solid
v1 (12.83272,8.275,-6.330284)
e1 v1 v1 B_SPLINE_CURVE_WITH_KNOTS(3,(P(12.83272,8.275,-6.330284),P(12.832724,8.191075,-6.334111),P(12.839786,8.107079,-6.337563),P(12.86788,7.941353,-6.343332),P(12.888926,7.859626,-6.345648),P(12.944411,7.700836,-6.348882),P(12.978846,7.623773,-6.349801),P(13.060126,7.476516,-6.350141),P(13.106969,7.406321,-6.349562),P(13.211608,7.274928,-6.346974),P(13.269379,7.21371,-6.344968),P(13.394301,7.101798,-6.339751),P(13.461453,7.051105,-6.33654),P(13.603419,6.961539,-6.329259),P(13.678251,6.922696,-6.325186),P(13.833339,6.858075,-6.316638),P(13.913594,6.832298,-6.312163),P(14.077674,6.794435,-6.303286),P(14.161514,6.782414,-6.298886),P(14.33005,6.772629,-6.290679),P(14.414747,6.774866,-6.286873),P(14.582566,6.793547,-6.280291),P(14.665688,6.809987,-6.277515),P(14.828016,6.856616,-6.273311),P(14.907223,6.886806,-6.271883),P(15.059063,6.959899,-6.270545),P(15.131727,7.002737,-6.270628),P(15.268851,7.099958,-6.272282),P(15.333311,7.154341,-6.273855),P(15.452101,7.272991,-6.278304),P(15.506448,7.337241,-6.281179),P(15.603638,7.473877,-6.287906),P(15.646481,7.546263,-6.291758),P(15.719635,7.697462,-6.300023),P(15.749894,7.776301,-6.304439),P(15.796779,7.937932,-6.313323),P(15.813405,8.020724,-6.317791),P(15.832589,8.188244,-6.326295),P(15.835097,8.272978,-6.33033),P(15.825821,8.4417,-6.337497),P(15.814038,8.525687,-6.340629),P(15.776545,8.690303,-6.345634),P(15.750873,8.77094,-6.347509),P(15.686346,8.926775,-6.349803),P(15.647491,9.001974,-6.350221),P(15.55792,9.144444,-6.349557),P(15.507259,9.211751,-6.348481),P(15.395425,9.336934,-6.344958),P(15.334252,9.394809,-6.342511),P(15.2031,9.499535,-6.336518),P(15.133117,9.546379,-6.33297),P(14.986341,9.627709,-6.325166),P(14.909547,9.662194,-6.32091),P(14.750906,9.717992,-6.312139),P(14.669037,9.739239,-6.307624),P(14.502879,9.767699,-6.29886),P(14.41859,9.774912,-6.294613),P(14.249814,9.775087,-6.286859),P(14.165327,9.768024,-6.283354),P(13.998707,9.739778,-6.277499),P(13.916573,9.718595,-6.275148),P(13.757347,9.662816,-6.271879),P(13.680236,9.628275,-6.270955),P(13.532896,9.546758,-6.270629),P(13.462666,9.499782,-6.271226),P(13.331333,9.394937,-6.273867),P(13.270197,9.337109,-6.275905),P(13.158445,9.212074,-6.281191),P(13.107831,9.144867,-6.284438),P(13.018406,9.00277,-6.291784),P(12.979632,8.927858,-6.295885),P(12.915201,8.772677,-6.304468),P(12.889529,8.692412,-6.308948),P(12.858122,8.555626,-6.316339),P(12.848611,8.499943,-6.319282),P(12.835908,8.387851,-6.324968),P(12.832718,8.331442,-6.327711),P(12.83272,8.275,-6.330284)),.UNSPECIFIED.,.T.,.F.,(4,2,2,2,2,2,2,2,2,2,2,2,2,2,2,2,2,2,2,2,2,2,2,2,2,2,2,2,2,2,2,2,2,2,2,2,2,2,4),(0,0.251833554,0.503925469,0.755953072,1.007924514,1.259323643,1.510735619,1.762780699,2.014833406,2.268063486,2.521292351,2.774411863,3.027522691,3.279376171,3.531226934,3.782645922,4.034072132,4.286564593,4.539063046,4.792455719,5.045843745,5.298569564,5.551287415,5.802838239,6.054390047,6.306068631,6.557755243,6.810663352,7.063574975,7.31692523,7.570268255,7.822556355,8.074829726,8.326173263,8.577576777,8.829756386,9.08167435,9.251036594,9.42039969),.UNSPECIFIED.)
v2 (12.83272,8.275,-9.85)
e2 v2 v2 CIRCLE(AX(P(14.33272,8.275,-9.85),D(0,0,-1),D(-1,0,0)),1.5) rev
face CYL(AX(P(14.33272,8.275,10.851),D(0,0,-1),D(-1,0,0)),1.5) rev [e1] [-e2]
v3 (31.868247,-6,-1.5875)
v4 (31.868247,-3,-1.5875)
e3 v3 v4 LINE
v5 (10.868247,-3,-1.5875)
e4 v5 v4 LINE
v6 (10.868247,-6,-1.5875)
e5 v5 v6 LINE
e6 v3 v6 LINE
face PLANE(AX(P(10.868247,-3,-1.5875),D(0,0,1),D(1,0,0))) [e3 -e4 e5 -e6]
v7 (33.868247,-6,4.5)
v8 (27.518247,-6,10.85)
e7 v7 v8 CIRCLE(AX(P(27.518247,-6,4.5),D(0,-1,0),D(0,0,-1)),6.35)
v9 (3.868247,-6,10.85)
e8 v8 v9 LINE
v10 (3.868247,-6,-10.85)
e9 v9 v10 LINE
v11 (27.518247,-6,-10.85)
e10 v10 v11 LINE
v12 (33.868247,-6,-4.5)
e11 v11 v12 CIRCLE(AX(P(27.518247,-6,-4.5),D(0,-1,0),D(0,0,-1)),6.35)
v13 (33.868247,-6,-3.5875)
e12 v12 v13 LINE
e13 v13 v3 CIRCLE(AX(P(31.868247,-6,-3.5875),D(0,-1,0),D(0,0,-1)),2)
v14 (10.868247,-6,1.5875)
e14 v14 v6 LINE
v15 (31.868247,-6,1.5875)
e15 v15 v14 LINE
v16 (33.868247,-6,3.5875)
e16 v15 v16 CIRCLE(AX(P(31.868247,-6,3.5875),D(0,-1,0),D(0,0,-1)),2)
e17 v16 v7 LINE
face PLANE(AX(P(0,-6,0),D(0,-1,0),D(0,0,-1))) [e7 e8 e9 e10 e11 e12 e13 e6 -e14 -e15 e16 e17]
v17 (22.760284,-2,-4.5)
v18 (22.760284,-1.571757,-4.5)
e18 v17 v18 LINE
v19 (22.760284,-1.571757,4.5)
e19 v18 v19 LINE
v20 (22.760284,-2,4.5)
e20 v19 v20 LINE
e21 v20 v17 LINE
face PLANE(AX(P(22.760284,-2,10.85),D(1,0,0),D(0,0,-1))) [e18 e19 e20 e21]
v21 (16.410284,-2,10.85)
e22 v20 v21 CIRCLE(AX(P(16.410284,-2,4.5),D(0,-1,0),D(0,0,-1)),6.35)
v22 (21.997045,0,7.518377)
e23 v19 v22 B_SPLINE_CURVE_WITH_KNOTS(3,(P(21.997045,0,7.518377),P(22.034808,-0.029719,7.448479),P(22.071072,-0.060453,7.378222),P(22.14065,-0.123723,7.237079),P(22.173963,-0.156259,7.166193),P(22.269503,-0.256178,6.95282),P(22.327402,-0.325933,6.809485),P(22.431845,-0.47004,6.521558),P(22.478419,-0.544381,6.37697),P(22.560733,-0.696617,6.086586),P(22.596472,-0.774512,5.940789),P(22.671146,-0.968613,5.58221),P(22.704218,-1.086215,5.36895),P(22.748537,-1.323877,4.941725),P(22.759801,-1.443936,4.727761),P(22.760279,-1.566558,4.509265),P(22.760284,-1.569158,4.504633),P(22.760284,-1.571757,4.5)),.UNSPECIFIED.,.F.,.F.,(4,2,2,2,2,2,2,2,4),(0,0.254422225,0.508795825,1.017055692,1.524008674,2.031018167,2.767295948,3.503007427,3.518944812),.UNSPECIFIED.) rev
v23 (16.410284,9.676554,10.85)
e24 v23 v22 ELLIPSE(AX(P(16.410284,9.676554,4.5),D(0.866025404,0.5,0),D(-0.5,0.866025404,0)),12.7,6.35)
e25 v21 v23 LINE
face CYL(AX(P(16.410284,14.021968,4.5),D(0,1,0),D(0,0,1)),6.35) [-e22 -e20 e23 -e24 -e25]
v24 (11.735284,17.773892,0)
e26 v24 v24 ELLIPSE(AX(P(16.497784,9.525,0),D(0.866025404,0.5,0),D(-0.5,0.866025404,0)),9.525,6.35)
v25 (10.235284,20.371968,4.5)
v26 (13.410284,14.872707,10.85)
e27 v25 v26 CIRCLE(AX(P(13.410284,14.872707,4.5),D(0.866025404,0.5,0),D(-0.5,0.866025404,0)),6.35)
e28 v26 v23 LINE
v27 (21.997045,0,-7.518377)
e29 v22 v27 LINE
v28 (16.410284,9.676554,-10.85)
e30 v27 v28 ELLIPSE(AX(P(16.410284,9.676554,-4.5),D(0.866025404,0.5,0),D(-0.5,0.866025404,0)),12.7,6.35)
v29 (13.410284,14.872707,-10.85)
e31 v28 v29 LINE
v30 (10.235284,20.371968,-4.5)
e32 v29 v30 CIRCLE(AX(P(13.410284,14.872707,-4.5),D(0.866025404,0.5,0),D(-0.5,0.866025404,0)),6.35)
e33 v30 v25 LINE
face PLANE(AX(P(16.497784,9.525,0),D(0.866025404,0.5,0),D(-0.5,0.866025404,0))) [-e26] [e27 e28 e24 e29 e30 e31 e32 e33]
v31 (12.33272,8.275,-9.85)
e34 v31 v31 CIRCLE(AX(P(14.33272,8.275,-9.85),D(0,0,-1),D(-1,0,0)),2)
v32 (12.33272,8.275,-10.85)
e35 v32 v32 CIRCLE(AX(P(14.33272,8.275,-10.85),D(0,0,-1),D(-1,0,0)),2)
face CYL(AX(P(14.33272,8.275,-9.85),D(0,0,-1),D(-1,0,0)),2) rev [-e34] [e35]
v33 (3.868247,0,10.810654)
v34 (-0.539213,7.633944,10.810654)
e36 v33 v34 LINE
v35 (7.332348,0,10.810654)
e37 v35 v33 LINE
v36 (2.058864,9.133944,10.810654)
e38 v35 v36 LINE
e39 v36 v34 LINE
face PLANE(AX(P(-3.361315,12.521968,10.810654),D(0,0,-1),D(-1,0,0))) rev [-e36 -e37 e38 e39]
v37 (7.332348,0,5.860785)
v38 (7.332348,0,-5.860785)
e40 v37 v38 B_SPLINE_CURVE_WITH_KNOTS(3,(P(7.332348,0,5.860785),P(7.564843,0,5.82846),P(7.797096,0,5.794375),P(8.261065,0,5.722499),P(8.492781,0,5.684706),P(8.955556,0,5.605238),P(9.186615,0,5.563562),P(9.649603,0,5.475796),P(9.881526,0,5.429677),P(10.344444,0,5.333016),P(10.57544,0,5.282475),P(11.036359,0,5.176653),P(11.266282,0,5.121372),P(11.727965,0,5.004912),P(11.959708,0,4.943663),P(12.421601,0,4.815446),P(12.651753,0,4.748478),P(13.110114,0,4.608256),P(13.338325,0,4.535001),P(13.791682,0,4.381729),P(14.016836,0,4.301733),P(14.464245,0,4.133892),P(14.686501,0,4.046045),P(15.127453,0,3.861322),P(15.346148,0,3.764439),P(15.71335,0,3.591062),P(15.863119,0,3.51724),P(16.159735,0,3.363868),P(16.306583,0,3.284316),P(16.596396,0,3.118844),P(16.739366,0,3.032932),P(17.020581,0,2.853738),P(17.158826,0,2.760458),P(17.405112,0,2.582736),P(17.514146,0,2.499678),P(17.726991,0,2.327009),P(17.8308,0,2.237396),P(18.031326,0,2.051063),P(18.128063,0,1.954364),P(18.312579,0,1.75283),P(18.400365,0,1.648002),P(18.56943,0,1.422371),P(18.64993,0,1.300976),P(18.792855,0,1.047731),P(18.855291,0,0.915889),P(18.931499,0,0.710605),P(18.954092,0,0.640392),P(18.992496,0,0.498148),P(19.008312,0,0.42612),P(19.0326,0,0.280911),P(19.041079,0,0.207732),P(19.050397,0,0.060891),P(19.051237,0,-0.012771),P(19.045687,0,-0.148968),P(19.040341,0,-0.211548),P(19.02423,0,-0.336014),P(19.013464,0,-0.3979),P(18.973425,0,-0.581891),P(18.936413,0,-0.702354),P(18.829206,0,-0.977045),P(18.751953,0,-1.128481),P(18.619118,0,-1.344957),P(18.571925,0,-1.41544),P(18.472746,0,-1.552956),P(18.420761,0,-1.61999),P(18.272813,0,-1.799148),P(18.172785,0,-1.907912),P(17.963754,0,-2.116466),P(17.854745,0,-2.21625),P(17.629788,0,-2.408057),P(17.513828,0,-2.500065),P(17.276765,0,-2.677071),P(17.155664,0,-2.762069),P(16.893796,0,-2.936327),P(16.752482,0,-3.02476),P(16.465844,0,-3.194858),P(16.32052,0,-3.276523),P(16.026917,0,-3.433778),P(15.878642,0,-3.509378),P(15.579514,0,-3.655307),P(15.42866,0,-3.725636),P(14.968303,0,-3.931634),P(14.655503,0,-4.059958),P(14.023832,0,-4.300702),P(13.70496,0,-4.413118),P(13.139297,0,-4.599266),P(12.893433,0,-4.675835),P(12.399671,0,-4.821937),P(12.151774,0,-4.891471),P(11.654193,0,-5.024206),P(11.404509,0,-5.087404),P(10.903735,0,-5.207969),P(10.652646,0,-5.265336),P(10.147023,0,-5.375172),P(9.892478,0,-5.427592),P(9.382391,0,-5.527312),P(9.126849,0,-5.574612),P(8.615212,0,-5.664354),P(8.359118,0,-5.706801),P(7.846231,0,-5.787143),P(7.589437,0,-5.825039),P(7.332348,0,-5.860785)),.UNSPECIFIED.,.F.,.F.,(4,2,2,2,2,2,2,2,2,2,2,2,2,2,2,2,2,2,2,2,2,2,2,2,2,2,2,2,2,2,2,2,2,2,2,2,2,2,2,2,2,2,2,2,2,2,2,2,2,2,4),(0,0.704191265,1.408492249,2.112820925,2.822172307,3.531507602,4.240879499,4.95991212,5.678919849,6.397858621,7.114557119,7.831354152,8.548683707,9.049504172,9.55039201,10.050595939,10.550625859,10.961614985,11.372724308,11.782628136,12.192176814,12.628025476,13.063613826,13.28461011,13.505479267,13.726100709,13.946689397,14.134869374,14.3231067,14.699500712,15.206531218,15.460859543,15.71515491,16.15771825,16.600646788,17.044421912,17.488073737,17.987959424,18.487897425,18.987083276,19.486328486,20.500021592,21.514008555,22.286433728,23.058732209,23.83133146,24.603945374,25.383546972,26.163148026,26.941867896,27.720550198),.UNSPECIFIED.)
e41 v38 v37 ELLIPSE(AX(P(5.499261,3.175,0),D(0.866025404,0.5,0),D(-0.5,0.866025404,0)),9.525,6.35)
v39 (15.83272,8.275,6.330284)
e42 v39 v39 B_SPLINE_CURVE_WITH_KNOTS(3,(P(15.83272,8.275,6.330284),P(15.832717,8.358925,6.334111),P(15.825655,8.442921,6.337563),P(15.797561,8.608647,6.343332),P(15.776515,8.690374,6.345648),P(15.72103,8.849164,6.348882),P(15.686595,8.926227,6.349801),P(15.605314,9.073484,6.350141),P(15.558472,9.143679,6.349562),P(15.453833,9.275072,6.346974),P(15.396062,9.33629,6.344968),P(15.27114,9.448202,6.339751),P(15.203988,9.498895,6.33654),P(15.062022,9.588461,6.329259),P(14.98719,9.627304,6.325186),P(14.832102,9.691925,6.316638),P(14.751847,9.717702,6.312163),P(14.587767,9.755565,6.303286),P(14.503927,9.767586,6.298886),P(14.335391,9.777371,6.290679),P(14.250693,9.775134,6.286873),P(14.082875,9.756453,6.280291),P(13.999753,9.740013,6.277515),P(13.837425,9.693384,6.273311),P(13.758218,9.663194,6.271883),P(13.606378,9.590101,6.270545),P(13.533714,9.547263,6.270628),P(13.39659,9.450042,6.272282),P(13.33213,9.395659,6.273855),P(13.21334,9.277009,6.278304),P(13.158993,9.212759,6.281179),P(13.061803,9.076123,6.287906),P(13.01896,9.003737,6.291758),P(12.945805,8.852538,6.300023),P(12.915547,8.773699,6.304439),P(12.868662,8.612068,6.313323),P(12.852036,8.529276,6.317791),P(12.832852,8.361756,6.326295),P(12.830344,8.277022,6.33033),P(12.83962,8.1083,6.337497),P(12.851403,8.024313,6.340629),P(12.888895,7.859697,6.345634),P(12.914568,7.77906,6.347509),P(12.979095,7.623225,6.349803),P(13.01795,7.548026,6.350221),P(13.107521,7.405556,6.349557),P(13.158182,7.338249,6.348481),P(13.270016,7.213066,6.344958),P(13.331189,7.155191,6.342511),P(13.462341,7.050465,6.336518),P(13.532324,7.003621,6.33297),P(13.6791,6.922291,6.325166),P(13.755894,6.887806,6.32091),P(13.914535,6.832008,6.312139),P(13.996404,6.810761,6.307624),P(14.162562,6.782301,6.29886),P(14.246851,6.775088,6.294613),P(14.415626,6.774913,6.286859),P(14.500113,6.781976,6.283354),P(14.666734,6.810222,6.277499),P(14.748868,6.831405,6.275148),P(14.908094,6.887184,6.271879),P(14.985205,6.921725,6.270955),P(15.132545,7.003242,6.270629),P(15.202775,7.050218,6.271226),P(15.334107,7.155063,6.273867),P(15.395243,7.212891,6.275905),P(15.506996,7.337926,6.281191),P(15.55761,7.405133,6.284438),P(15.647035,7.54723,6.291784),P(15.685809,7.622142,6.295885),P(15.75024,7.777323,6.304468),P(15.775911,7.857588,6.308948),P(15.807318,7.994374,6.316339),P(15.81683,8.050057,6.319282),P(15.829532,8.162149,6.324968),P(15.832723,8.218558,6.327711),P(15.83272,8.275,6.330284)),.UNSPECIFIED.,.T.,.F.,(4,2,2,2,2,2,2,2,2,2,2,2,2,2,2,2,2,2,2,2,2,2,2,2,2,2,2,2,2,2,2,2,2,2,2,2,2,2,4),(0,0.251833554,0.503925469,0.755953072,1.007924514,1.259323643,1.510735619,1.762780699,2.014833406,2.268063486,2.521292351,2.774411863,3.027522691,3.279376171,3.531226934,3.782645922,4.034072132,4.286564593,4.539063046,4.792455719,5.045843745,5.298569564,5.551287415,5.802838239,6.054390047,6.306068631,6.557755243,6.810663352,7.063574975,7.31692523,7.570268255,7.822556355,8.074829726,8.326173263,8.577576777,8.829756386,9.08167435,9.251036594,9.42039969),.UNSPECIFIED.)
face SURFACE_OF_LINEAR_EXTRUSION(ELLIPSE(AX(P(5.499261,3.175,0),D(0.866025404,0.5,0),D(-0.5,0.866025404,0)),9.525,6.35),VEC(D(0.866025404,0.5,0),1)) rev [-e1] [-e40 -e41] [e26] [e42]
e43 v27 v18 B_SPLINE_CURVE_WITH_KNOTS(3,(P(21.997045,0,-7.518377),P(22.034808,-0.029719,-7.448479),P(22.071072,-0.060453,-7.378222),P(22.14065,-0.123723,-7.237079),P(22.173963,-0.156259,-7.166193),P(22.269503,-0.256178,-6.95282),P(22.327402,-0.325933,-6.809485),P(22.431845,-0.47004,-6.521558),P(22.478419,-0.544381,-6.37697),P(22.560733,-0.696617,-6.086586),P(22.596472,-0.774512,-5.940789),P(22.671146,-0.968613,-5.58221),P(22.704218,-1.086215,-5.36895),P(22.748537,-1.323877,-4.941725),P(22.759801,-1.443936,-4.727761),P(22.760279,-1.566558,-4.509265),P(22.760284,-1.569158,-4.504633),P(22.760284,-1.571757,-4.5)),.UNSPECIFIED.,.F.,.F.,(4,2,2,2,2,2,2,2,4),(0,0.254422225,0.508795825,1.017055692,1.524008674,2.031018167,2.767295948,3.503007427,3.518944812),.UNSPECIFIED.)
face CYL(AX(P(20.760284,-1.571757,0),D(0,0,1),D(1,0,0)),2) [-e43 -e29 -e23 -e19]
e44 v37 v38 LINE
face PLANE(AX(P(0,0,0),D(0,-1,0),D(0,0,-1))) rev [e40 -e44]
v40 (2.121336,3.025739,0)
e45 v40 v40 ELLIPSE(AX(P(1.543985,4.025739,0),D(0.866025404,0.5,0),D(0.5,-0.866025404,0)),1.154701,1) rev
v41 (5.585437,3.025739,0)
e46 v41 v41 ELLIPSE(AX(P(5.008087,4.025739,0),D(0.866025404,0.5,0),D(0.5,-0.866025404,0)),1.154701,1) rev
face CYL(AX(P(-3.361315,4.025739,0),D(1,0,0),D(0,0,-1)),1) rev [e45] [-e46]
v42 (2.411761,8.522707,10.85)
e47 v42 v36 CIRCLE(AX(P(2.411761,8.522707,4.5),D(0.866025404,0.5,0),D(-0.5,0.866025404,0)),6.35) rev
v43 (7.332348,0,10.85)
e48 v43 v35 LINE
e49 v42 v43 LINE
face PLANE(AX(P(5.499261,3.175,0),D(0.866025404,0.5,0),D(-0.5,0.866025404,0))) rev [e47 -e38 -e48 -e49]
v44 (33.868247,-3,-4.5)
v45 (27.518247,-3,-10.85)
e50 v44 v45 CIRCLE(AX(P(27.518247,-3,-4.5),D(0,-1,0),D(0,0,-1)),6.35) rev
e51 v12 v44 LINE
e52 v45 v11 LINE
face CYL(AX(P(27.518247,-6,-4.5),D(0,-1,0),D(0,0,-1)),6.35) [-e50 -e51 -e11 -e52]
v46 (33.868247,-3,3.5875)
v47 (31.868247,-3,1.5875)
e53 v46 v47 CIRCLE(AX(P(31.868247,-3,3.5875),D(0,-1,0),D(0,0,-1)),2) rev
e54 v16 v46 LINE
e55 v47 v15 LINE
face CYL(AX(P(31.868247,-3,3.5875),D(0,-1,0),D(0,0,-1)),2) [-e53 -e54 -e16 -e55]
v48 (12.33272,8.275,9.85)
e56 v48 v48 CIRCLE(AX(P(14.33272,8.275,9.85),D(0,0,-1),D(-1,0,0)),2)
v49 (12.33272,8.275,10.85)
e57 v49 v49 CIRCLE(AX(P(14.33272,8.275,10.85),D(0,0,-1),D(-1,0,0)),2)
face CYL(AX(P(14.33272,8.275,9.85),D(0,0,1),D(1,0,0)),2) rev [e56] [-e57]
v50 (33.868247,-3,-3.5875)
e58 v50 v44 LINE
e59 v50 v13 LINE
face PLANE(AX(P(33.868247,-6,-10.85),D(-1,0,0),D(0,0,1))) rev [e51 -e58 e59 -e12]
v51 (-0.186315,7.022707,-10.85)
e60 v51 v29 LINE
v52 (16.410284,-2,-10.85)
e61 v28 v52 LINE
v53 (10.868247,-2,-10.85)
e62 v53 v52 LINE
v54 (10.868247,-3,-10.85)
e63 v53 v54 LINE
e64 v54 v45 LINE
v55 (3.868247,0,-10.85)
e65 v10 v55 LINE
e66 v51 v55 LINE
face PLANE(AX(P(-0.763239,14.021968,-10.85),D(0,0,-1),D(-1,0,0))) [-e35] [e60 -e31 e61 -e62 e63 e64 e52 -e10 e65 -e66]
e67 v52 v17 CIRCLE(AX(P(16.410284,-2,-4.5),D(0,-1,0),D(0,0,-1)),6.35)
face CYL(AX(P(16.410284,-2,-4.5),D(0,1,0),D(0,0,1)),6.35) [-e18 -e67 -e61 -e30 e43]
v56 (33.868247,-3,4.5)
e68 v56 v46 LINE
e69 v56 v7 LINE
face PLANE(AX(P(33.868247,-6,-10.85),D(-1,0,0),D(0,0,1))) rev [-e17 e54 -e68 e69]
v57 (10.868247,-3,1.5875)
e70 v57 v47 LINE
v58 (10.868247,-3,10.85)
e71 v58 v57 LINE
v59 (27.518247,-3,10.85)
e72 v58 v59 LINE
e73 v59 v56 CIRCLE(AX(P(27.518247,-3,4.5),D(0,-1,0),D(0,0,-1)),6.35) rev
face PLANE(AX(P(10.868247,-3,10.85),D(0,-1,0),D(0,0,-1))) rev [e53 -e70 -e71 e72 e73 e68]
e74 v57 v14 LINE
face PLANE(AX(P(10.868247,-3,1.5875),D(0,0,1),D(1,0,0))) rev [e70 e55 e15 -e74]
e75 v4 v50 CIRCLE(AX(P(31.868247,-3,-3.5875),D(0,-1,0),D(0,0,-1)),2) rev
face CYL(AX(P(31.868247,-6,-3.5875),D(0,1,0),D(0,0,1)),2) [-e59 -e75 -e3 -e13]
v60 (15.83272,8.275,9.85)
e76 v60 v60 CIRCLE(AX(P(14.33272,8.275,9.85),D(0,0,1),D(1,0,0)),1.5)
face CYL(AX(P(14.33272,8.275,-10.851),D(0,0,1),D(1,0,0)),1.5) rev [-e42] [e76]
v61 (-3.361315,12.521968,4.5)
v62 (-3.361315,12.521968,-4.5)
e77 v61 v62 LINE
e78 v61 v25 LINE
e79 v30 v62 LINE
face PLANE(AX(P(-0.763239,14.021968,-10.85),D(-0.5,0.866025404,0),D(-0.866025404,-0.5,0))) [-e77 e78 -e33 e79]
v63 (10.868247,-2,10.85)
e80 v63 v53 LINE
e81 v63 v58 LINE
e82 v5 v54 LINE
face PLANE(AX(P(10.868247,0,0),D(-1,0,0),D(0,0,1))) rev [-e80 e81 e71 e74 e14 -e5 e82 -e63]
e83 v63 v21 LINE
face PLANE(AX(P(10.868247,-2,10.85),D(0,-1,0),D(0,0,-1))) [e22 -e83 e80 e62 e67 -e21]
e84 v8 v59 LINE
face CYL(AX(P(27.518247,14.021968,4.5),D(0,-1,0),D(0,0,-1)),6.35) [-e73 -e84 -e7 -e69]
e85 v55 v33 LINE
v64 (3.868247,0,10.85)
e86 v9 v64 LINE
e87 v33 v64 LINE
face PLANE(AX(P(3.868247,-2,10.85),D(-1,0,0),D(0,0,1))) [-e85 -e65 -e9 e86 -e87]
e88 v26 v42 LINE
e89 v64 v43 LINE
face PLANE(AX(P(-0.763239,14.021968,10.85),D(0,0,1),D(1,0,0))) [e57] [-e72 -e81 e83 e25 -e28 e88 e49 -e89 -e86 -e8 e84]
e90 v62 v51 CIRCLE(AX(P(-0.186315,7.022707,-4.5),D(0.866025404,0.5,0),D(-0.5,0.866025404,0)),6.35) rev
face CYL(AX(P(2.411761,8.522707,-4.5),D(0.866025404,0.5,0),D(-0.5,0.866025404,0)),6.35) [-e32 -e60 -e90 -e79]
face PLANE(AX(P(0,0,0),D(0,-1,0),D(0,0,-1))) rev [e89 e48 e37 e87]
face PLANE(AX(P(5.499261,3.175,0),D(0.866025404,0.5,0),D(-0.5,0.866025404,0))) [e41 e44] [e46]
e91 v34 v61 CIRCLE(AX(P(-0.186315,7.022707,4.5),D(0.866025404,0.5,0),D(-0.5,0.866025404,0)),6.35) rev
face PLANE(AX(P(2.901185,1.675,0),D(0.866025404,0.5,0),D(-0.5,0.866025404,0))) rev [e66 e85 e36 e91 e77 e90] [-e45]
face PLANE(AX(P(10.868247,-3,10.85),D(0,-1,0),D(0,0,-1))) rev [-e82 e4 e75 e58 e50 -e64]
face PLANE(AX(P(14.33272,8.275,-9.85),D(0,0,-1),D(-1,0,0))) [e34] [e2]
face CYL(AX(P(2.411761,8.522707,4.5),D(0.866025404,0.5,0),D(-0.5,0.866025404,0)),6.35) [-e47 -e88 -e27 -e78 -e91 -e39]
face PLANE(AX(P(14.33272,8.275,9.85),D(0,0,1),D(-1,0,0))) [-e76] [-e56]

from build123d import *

# Parameters (mm, degrees)
SKETCH2_W           = 21.7
SKETCH2_H           = 25.05
SKETCH2_RX          = 9.525
SKETCH2_RY          = 6.35
BOSS_EXTRUDE1_DEPTH = 12.7
SKETCH3_W           = 21.660653916
SKETCH3_H           = 25.05
BOSS_EXTRUDE2_DEPTH = 3
SKETCH5_W           = 18.892037138
SKETCH5_H           = 21.7
BOSS_EXTRUDE3_DEPTH = 2
SKETCH6_W           = 30
SKETCH6_H           = 21.7
BOSS_EXTRUDE4_DEPTH = 4
SKETCH7_W           = 21.7
SKETCH7_H           = 1
SKETCH7_W_2         = 3.175
SKETCH7_H_2         = 3
CUT_EXTRUDE2_DEPTH  = 23
SKETCH7_3_W         = 21.7
SKETCH7_3_H         = 7.272473706
CUT_EXTRUDE3_DEPTH  = 44.803879418
SKETCH11_R          = 1
CUT_EXTRUDE8_DEPTH  = 33.487034031
CUT_EXTRUDE4_REACH  = 47.088
SKETCH9_R           = 1.5
SKETCH10_R          = 2
CUT_EXTRUDE7_DEPTH  = 1
FILLET5_R           = 6.35
FILLET6_R           = 2
FILLET7_R           = 2


with BuildPart() as part:
    # Sketch2 → Boss-Extrude1 (new body)
    with BuildSketch(Plane(origin=(16.497783942, 9.525, 0), x_dir=(0, 0, -1), z_dir=(0.8660254037844379, 0.5000000000000013, 0))):
        Rectangle(SKETCH2_W, SKETCH2_H)
        with Locations(Location((0, 0), (0, 0, 90))):
            Ellipse(SKETCH2_RX, SKETCH2_RY, mode=Mode.SUBTRACT)
    extrude(amount=-BOSS_EXTRUDE1_DEPTH)

    # Sketch3 → Boss-Extrude2 (add)
    with BuildSketch(Plane(origin=(5.499261314, 3.175, 0), x_dir=(0, 0, 1), z_dir=(-0.8660254037844379, -0.5000000000000014, 0))):
        with Locations((-0.019673042, 0)):
            Rectangle(SKETCH3_W, SKETCH3_H)
    extrude(amount=BOSS_EXTRUDE2_DEPTH)

    # Sketch5 → Boss-Extrude3 (add)
    with BuildSketch(Plane(origin=(0, 0, 0), x_dir=(-1, 0, 0), z_dir=(0, 1, 0))):
        with Locations((-13.314265373, 0)):
            Rectangle(SKETCH5_W, SKETCH5_H)
    extrude(amount=-BOSS_EXTRUDE3_DEPTH)

    # Sketch6 → Boss-Extrude4 (add)
    with BuildSketch(Plane.XZ.offset(2)):
        with Locations((18.868246804, 0)):
            Rectangle(SKETCH6_W, SKETCH6_H)
    extrude(amount=BOSS_EXTRUDE4_DEPTH)

    # Sketch7 → Cut-Extrude2 (cut)
    with BuildSketch(Plane(origin=(33.868246804, 0, 0), x_dir=(0, 0, -1), z_dir=(1, 0, 0))):
        with Locations((0, -2.5)):
            Rectangle(SKETCH7_W, SKETCH7_H)
        with Locations((0, -4.5)):
            Rectangle(SKETCH7_W_2, SKETCH7_H_2)
    extrude(amount=-CUT_EXTRUDE2_DEPTH, mode=Mode.SUBTRACT)

    # Sketch7<3> → Cut-Extrude3 (cut, through all)
    with BuildSketch(Plane(origin=(33.868246804, 0, 0), x_dir=(0, 0, -1), z_dir=(1, 0, 0))):
        with Locations((0, -9.636236853)):
            Rectangle(SKETCH7_3_W, SKETCH7_3_H)
    extrude(amount=-CUT_EXTRUDE3_DEPTH, mode=Mode.SUBTRACT)

    # Sketch11 → Cut-Extrude8 (cut, through all)
    with BuildSketch(Plane(origin=(19.672783942, 0.194872981, 0), x_dir=(0, 0, -1), z_dir=(-1, 0, 0))):
        with Locations(Location((0, -3.830865705, 0), (0, 0, 90))):
            Circle(SKETCH11_R)
    extrude(amount=CUT_EXTRUDE8_DEPTH, mode=Mode.SUBTRACT)

    # Sketch9 → Cut-Extrude4 (cut, up to next)
    with BuildSketch(Plane(origin=(0, 0, -10.85), x_dir=(-1, 0, 0), z_dir=(0, 0, -1)), mode=Mode.PRIVATE) as cut_extrude4_sk1:
        with Locations((-14.332720433, 8.275)):
            Circle(SKETCH9_R)
    cut_extrude4_tool1 = extrude(cut_extrude4_sk1.sketch, amount=-CUT_EXTRUDE4_REACH, mode=Mode.PRIVATE) & part.part
    cut_extrude4 = cut_extrude4_tool1.solids().sort_by_distance((14.33272, 8.275, -10.85))[0]
    add(cut_extrude4, mode=Mode.SUBTRACT)

    # Sketch10 → Cut-Extrude7 (cut)
    with BuildSketch(Plane(origin=(0, 0, -10.85), x_dir=(-1, 0, 0), z_dir=(0, 0, -1))):
        with Locations((-14.332720433, 8.275)):
            Circle(SKETCH10_R)
    cut_extrude7 = extrude(amount=-CUT_EXTRUDE7_DEPTH, mode=Mode.SUBTRACT)

    # Mirror1: Cut-Extrude4, Cut-Extrude7 across plane
    add(cut_extrude4.mirror(Plane.XY), mode=Mode.SUBTRACT)
    add(cut_extrude7.mirror(Plane.XY), mode=Mode.SUBTRACT)

    # Fillet5
    fillet5_edges = [part.edges().sort_by_distance(p)[0] for p in [
        (33.868246804, -4.5, 10.85),
        (33.868246804, -4.5, -10.85),
        (22.760283942, -1, -10.85),
        (22.760283942, -1, 10.85),
        (4.736022628, 17.196968182, 10.85),
        (3.436984522, 16.446968182, -10.85),
    ]]
    fillet(fillet5_edges, radius=FILLET5_R)

    # Fillet6
    fillet6_edges = [part.edges().sort_by_distance(p)[0] for p in [
        (33.868246804, -4.5, 1.5875),
        (33.868246804, -4.5, -1.5875),
    ]]
    fillet(fillet6_edges, radius=FILLET6_R)

    # Fillet7
    # the kernel refuses this fillet: 2 mm, written as the material it takes off along each edge
    with BuildSketch(Plane(origin=(22.760283942, 0, 8.429393602), x_dir=(-1, 0, 0), z_dir=(0, 0, -1))) as fillet7_piece_1:
        with BuildLine():
            CenterArc((2, -1.571757441), FILLET7_R, 128.197977663, 51.802022337)
            Line((0, -1.571757441), (-0.04, -1.571757441))
            Line((-0.04, -1.571757441), (-0.04, 0))
            Line((-0.04, 0), (0, 0.04))
            ThreePointArc((0, 0.04), (0.381619343, 0.04), (0.73850346, 0.031435149))
            Line((0.73850346, 0.031435149), (0.763238686, 0))
        make_face()
    extrude(amount=16.858787203, mode=Mode.SUBTRACT)


solid = part.part
